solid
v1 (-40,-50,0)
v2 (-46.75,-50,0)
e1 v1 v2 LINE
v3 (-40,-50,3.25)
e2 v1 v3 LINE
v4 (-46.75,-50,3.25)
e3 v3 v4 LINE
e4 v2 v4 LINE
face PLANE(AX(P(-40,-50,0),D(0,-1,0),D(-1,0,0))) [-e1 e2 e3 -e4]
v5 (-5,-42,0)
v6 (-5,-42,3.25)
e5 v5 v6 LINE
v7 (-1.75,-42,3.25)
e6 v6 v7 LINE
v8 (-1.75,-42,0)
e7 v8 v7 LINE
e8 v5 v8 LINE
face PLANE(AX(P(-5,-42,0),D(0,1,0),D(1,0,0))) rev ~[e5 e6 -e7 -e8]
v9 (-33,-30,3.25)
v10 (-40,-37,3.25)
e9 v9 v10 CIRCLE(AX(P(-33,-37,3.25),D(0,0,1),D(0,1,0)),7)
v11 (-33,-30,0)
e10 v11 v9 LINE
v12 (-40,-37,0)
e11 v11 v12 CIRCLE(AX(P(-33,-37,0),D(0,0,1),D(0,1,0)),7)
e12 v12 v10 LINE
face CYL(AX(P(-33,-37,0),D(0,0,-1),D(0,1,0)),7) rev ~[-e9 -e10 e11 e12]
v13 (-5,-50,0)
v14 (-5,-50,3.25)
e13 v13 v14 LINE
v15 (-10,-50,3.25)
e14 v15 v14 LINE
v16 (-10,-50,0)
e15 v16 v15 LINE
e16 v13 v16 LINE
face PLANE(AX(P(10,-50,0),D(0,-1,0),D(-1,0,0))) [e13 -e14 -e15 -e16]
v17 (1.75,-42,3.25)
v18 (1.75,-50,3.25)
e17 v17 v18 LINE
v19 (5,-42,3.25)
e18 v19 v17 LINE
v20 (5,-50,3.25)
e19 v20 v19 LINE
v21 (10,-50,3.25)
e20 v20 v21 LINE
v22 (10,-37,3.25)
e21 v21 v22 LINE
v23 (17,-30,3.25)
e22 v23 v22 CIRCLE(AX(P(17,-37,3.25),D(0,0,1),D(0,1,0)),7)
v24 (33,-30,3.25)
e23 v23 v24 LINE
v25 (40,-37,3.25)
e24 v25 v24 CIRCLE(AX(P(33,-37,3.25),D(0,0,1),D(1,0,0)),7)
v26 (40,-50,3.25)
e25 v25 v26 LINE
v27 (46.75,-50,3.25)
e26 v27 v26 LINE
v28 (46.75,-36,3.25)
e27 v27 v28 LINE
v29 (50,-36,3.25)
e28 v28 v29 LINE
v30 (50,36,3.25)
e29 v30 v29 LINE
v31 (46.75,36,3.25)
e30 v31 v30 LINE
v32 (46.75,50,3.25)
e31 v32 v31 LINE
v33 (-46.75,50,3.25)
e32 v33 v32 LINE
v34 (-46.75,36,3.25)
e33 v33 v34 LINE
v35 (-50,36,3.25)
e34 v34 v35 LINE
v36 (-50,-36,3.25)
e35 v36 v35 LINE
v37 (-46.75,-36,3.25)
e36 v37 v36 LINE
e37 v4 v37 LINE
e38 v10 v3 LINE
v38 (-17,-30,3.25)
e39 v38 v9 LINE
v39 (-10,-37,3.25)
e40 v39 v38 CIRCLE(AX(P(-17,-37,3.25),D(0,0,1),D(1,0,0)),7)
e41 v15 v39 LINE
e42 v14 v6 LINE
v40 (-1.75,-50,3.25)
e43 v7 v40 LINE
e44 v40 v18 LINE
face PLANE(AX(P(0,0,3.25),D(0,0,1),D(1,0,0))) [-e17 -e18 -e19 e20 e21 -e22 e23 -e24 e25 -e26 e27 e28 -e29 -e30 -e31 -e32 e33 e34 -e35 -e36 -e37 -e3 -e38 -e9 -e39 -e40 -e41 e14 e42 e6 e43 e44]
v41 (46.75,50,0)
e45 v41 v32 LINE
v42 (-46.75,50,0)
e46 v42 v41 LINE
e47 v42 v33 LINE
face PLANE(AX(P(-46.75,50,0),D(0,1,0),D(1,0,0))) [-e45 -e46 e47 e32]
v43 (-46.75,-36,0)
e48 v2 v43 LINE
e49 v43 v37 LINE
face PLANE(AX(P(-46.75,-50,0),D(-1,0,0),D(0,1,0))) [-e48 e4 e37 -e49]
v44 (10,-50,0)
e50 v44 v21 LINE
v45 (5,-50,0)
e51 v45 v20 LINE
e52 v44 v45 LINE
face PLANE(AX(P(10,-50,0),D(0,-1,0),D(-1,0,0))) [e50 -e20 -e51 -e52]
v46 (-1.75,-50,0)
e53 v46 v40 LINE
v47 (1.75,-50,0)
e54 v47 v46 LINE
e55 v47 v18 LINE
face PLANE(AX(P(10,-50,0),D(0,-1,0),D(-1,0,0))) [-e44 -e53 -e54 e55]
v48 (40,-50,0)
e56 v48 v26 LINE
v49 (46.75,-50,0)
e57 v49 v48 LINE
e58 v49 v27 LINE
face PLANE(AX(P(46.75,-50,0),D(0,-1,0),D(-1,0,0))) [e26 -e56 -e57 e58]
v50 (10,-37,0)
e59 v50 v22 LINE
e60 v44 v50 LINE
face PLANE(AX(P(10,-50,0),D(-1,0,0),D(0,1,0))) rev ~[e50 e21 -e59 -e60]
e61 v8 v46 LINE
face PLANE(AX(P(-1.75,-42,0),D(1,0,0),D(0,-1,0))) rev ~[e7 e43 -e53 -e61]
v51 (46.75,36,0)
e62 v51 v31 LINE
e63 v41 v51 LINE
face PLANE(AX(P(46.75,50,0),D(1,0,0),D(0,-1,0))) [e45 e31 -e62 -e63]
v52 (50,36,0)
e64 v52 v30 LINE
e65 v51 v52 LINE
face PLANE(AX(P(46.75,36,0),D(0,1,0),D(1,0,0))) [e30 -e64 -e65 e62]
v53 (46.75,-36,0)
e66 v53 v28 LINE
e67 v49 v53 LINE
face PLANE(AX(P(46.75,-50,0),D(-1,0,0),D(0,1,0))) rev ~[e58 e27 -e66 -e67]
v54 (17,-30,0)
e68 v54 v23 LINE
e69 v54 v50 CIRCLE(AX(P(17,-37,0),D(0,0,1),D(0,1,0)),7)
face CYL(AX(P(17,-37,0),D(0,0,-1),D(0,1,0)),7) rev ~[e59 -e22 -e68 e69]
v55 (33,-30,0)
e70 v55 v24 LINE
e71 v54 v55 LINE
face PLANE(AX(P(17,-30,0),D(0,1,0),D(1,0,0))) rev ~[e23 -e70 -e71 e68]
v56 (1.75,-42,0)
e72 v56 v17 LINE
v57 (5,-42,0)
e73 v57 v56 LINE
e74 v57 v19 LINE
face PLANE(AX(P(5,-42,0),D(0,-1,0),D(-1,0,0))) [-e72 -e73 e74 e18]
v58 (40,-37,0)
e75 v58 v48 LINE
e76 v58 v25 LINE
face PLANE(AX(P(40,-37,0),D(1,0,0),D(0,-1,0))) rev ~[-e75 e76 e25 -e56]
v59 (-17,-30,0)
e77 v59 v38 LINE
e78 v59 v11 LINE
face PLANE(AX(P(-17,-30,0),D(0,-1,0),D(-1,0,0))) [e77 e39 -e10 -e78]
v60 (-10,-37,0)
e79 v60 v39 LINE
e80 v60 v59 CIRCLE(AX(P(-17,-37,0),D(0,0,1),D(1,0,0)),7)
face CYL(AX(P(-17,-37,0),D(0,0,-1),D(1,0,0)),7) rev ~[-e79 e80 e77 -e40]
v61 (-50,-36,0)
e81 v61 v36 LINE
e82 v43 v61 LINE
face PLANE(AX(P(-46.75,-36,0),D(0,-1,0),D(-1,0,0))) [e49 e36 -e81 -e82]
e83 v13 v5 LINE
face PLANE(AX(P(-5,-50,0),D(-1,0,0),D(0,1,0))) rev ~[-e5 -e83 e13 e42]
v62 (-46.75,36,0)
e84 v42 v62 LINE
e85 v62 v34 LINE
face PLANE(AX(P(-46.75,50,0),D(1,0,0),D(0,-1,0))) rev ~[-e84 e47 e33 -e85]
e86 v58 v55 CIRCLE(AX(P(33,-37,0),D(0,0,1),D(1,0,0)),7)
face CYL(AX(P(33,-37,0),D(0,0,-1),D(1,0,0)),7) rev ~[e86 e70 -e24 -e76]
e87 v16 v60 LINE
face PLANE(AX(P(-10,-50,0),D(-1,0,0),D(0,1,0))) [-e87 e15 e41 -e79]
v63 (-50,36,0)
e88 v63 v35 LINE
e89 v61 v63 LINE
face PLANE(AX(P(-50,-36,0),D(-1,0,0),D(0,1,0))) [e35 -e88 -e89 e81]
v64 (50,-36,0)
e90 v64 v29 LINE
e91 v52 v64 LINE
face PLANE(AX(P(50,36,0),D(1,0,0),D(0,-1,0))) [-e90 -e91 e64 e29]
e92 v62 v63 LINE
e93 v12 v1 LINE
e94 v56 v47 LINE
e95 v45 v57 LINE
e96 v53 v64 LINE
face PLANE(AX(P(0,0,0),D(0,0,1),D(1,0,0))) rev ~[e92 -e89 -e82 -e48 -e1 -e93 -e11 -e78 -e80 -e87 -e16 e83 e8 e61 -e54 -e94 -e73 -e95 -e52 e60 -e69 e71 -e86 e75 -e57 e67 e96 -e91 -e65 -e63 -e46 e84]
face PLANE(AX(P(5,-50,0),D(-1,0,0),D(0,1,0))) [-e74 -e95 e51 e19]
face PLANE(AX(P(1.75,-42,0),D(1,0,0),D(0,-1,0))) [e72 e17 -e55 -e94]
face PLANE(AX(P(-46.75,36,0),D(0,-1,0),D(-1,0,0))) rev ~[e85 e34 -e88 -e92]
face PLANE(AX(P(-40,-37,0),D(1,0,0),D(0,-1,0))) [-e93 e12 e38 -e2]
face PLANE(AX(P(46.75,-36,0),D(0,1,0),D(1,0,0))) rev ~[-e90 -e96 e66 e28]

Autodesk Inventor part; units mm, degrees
ref_plane "YZ Plane" through (0, 0, 0) normal (1, 0, 0) x (0, 1, 0)
ref_plane "XZ Plane" through (0, 0, 0) normal (0, 1, 0) x (-1, 0, 0)
ref_plane "XY Plane" through (0, 0, 0) normal (0, 0, 1) x (1, 0, 0)
sketch "Sketch1" plane through (0, 0, 0) normal (0, 0, 1) x (1, 0, 0)
  line L0 (-50, 50) -> (50, 50)
  line L1 (50, 50) -> (50, -50)
  line L2 (50, -50) -> (-50, -50)
  line L3 (-50, -50) -> (-50, 50)
  line L4 (-92.7646, -8.503) -> (-89.7646, -8.503)
  line L5 (-89.7646, -8.503) -> (-89.7646, -11.753)
  line L6 (-89.7646, -11.753) -> (-92.7646, -11.753)
  line L7 (-92.7646, -11.753) -> (-92.7646, -8.503)
  line L8 (-92.7646, -21.6527) -> (-89.7646, -21.6527)
  line L9 (-89.7646, -21.6527) -> (-89.7646, -21.7527)
  line L10 (-89.7646, -21.7527) -> (-92.7646, -21.7527)
  line L11 (-92.7646, -21.7527) -> (-92.7646, -21.6527)
  line L12 (-50, 50) -> (-46.75, 50)
  line L13 (-46.75, 50) -> (-46.75, 36)
  line L14 (-46.75, 36) -> (-50, 36)
  line L15 (-50, 36) -> (-50, 50)
  line L16 (0, 50) -> (0, -50) construction
  line L17 (-50, 0) -> (50, 0) construction
  line L18 (50, 50) -> (46.75, 50)
  line L19 (46.75, 50) -> (46.75, 36)
  line L20 (46.75, 36) -> (50, 36)
  line L21 (50, 36) -> (50, 50)
  line L22 (-50, -50) -> (-46.75, -50)
  line L23 (-46.75, -50) -> (-46.75, -36)
  line L24 (-46.75, -36) -> (-50, -36)
  line L25 (-50, -36) -> (-50, -50)
  line L26 (46.75, -50) -> (46.75, -36)
  line L27 (46.75, -36) -> (50, -36)
  line L28 (50, -36) -> (50, -50)
  line L29 (50, -50) -> (46.75, -50)
  line L30 (-40, -50) -> (-10, -50)
  line L31 (-10, -50) -> (-10, -37)
  line L32 (-17, -30) -> (-33, -30)
  line L33 (-40, -37) -> (-40, -50)
  line L34 (40, -50) -> (10, -50)
  line L35 (10, -50) -> (10, -37)
  line L36 (17, -30) -> (33, -30)
  line L37 (40, -37) -> (40, -50)
  line L38 (-1.75, -50) -> (-5, -50)
  line L39 (-5, -50) -> (-5, -42)
  line L40 (-5, -42) -> (-1.75, -42)
  line L41 (-1.75, -42) -> (-1.75, -50)
  line L42 (1.75, -50) -> (5, -50)
  line L43 (5, -50) -> (5, -42)
  line L44 (5, -42) -> (1.75, -42)
  line L45 (1.75, -42) -> (1.75, -50)
  arc A0 (-33, -30) -> (-40, -37) centre (-33, -37) ccw
  arc A1 (-10, -37) -> (-17, -30) centre (-17, -37) ccw
  arc A2 (17, -30) -> (10, -37) centre (17, -37) ccw
  arc A3 (40, -37) -> (33, -30) centre (33, -37) ccw
  point P0 (0, 0)
  point P1 (-10, -30)
  point P2 (-40, -30)
  point P3 (10, -30)
  point P4 (40, -30)
  dimension "d0" = 100
  dimension "d2" = 100
  dimension "d3" = 3
  dimension "mat" = 3.25
  dimension "d5" = 3
  dimension "kerf" = 0.1
  dimension "d7" = 3.25
  dimension "d8" = 14
  dimension "d15" = 30
  dimension "d16" = 20
  dimension "d17" = 10
  dimension "d20" = 3.25
  dimension "d21" = 8
  dimension "d22" = 5
  dimension "d25" = 45
  dimension "d26" = 7
extrude "Extrusion2" add sketch "Sketch1" along normal blind 3.25 contours L0 L19 L20 L1 L27 L26 L2 L37 A3 L36 A2 L35 L43 L44 L45 L41 L40 L39 L31 A1 L32 A0 L33 L23 L24 L3 L14 L13 | L39 L40 L41 L2 | L45 L44 L43 L2
extrude "Extrusion3" cut sketch "Sketch1" along normal blind 3.25 contours L39 L40 L41 L2 | L45 L44 L43 L2
equation "\"d7\" = mat"
equation "\"d20\" = mat"
equation "\"d18\" = mat"
equation "\"d23\" = mat"
properties part number "body-back"
